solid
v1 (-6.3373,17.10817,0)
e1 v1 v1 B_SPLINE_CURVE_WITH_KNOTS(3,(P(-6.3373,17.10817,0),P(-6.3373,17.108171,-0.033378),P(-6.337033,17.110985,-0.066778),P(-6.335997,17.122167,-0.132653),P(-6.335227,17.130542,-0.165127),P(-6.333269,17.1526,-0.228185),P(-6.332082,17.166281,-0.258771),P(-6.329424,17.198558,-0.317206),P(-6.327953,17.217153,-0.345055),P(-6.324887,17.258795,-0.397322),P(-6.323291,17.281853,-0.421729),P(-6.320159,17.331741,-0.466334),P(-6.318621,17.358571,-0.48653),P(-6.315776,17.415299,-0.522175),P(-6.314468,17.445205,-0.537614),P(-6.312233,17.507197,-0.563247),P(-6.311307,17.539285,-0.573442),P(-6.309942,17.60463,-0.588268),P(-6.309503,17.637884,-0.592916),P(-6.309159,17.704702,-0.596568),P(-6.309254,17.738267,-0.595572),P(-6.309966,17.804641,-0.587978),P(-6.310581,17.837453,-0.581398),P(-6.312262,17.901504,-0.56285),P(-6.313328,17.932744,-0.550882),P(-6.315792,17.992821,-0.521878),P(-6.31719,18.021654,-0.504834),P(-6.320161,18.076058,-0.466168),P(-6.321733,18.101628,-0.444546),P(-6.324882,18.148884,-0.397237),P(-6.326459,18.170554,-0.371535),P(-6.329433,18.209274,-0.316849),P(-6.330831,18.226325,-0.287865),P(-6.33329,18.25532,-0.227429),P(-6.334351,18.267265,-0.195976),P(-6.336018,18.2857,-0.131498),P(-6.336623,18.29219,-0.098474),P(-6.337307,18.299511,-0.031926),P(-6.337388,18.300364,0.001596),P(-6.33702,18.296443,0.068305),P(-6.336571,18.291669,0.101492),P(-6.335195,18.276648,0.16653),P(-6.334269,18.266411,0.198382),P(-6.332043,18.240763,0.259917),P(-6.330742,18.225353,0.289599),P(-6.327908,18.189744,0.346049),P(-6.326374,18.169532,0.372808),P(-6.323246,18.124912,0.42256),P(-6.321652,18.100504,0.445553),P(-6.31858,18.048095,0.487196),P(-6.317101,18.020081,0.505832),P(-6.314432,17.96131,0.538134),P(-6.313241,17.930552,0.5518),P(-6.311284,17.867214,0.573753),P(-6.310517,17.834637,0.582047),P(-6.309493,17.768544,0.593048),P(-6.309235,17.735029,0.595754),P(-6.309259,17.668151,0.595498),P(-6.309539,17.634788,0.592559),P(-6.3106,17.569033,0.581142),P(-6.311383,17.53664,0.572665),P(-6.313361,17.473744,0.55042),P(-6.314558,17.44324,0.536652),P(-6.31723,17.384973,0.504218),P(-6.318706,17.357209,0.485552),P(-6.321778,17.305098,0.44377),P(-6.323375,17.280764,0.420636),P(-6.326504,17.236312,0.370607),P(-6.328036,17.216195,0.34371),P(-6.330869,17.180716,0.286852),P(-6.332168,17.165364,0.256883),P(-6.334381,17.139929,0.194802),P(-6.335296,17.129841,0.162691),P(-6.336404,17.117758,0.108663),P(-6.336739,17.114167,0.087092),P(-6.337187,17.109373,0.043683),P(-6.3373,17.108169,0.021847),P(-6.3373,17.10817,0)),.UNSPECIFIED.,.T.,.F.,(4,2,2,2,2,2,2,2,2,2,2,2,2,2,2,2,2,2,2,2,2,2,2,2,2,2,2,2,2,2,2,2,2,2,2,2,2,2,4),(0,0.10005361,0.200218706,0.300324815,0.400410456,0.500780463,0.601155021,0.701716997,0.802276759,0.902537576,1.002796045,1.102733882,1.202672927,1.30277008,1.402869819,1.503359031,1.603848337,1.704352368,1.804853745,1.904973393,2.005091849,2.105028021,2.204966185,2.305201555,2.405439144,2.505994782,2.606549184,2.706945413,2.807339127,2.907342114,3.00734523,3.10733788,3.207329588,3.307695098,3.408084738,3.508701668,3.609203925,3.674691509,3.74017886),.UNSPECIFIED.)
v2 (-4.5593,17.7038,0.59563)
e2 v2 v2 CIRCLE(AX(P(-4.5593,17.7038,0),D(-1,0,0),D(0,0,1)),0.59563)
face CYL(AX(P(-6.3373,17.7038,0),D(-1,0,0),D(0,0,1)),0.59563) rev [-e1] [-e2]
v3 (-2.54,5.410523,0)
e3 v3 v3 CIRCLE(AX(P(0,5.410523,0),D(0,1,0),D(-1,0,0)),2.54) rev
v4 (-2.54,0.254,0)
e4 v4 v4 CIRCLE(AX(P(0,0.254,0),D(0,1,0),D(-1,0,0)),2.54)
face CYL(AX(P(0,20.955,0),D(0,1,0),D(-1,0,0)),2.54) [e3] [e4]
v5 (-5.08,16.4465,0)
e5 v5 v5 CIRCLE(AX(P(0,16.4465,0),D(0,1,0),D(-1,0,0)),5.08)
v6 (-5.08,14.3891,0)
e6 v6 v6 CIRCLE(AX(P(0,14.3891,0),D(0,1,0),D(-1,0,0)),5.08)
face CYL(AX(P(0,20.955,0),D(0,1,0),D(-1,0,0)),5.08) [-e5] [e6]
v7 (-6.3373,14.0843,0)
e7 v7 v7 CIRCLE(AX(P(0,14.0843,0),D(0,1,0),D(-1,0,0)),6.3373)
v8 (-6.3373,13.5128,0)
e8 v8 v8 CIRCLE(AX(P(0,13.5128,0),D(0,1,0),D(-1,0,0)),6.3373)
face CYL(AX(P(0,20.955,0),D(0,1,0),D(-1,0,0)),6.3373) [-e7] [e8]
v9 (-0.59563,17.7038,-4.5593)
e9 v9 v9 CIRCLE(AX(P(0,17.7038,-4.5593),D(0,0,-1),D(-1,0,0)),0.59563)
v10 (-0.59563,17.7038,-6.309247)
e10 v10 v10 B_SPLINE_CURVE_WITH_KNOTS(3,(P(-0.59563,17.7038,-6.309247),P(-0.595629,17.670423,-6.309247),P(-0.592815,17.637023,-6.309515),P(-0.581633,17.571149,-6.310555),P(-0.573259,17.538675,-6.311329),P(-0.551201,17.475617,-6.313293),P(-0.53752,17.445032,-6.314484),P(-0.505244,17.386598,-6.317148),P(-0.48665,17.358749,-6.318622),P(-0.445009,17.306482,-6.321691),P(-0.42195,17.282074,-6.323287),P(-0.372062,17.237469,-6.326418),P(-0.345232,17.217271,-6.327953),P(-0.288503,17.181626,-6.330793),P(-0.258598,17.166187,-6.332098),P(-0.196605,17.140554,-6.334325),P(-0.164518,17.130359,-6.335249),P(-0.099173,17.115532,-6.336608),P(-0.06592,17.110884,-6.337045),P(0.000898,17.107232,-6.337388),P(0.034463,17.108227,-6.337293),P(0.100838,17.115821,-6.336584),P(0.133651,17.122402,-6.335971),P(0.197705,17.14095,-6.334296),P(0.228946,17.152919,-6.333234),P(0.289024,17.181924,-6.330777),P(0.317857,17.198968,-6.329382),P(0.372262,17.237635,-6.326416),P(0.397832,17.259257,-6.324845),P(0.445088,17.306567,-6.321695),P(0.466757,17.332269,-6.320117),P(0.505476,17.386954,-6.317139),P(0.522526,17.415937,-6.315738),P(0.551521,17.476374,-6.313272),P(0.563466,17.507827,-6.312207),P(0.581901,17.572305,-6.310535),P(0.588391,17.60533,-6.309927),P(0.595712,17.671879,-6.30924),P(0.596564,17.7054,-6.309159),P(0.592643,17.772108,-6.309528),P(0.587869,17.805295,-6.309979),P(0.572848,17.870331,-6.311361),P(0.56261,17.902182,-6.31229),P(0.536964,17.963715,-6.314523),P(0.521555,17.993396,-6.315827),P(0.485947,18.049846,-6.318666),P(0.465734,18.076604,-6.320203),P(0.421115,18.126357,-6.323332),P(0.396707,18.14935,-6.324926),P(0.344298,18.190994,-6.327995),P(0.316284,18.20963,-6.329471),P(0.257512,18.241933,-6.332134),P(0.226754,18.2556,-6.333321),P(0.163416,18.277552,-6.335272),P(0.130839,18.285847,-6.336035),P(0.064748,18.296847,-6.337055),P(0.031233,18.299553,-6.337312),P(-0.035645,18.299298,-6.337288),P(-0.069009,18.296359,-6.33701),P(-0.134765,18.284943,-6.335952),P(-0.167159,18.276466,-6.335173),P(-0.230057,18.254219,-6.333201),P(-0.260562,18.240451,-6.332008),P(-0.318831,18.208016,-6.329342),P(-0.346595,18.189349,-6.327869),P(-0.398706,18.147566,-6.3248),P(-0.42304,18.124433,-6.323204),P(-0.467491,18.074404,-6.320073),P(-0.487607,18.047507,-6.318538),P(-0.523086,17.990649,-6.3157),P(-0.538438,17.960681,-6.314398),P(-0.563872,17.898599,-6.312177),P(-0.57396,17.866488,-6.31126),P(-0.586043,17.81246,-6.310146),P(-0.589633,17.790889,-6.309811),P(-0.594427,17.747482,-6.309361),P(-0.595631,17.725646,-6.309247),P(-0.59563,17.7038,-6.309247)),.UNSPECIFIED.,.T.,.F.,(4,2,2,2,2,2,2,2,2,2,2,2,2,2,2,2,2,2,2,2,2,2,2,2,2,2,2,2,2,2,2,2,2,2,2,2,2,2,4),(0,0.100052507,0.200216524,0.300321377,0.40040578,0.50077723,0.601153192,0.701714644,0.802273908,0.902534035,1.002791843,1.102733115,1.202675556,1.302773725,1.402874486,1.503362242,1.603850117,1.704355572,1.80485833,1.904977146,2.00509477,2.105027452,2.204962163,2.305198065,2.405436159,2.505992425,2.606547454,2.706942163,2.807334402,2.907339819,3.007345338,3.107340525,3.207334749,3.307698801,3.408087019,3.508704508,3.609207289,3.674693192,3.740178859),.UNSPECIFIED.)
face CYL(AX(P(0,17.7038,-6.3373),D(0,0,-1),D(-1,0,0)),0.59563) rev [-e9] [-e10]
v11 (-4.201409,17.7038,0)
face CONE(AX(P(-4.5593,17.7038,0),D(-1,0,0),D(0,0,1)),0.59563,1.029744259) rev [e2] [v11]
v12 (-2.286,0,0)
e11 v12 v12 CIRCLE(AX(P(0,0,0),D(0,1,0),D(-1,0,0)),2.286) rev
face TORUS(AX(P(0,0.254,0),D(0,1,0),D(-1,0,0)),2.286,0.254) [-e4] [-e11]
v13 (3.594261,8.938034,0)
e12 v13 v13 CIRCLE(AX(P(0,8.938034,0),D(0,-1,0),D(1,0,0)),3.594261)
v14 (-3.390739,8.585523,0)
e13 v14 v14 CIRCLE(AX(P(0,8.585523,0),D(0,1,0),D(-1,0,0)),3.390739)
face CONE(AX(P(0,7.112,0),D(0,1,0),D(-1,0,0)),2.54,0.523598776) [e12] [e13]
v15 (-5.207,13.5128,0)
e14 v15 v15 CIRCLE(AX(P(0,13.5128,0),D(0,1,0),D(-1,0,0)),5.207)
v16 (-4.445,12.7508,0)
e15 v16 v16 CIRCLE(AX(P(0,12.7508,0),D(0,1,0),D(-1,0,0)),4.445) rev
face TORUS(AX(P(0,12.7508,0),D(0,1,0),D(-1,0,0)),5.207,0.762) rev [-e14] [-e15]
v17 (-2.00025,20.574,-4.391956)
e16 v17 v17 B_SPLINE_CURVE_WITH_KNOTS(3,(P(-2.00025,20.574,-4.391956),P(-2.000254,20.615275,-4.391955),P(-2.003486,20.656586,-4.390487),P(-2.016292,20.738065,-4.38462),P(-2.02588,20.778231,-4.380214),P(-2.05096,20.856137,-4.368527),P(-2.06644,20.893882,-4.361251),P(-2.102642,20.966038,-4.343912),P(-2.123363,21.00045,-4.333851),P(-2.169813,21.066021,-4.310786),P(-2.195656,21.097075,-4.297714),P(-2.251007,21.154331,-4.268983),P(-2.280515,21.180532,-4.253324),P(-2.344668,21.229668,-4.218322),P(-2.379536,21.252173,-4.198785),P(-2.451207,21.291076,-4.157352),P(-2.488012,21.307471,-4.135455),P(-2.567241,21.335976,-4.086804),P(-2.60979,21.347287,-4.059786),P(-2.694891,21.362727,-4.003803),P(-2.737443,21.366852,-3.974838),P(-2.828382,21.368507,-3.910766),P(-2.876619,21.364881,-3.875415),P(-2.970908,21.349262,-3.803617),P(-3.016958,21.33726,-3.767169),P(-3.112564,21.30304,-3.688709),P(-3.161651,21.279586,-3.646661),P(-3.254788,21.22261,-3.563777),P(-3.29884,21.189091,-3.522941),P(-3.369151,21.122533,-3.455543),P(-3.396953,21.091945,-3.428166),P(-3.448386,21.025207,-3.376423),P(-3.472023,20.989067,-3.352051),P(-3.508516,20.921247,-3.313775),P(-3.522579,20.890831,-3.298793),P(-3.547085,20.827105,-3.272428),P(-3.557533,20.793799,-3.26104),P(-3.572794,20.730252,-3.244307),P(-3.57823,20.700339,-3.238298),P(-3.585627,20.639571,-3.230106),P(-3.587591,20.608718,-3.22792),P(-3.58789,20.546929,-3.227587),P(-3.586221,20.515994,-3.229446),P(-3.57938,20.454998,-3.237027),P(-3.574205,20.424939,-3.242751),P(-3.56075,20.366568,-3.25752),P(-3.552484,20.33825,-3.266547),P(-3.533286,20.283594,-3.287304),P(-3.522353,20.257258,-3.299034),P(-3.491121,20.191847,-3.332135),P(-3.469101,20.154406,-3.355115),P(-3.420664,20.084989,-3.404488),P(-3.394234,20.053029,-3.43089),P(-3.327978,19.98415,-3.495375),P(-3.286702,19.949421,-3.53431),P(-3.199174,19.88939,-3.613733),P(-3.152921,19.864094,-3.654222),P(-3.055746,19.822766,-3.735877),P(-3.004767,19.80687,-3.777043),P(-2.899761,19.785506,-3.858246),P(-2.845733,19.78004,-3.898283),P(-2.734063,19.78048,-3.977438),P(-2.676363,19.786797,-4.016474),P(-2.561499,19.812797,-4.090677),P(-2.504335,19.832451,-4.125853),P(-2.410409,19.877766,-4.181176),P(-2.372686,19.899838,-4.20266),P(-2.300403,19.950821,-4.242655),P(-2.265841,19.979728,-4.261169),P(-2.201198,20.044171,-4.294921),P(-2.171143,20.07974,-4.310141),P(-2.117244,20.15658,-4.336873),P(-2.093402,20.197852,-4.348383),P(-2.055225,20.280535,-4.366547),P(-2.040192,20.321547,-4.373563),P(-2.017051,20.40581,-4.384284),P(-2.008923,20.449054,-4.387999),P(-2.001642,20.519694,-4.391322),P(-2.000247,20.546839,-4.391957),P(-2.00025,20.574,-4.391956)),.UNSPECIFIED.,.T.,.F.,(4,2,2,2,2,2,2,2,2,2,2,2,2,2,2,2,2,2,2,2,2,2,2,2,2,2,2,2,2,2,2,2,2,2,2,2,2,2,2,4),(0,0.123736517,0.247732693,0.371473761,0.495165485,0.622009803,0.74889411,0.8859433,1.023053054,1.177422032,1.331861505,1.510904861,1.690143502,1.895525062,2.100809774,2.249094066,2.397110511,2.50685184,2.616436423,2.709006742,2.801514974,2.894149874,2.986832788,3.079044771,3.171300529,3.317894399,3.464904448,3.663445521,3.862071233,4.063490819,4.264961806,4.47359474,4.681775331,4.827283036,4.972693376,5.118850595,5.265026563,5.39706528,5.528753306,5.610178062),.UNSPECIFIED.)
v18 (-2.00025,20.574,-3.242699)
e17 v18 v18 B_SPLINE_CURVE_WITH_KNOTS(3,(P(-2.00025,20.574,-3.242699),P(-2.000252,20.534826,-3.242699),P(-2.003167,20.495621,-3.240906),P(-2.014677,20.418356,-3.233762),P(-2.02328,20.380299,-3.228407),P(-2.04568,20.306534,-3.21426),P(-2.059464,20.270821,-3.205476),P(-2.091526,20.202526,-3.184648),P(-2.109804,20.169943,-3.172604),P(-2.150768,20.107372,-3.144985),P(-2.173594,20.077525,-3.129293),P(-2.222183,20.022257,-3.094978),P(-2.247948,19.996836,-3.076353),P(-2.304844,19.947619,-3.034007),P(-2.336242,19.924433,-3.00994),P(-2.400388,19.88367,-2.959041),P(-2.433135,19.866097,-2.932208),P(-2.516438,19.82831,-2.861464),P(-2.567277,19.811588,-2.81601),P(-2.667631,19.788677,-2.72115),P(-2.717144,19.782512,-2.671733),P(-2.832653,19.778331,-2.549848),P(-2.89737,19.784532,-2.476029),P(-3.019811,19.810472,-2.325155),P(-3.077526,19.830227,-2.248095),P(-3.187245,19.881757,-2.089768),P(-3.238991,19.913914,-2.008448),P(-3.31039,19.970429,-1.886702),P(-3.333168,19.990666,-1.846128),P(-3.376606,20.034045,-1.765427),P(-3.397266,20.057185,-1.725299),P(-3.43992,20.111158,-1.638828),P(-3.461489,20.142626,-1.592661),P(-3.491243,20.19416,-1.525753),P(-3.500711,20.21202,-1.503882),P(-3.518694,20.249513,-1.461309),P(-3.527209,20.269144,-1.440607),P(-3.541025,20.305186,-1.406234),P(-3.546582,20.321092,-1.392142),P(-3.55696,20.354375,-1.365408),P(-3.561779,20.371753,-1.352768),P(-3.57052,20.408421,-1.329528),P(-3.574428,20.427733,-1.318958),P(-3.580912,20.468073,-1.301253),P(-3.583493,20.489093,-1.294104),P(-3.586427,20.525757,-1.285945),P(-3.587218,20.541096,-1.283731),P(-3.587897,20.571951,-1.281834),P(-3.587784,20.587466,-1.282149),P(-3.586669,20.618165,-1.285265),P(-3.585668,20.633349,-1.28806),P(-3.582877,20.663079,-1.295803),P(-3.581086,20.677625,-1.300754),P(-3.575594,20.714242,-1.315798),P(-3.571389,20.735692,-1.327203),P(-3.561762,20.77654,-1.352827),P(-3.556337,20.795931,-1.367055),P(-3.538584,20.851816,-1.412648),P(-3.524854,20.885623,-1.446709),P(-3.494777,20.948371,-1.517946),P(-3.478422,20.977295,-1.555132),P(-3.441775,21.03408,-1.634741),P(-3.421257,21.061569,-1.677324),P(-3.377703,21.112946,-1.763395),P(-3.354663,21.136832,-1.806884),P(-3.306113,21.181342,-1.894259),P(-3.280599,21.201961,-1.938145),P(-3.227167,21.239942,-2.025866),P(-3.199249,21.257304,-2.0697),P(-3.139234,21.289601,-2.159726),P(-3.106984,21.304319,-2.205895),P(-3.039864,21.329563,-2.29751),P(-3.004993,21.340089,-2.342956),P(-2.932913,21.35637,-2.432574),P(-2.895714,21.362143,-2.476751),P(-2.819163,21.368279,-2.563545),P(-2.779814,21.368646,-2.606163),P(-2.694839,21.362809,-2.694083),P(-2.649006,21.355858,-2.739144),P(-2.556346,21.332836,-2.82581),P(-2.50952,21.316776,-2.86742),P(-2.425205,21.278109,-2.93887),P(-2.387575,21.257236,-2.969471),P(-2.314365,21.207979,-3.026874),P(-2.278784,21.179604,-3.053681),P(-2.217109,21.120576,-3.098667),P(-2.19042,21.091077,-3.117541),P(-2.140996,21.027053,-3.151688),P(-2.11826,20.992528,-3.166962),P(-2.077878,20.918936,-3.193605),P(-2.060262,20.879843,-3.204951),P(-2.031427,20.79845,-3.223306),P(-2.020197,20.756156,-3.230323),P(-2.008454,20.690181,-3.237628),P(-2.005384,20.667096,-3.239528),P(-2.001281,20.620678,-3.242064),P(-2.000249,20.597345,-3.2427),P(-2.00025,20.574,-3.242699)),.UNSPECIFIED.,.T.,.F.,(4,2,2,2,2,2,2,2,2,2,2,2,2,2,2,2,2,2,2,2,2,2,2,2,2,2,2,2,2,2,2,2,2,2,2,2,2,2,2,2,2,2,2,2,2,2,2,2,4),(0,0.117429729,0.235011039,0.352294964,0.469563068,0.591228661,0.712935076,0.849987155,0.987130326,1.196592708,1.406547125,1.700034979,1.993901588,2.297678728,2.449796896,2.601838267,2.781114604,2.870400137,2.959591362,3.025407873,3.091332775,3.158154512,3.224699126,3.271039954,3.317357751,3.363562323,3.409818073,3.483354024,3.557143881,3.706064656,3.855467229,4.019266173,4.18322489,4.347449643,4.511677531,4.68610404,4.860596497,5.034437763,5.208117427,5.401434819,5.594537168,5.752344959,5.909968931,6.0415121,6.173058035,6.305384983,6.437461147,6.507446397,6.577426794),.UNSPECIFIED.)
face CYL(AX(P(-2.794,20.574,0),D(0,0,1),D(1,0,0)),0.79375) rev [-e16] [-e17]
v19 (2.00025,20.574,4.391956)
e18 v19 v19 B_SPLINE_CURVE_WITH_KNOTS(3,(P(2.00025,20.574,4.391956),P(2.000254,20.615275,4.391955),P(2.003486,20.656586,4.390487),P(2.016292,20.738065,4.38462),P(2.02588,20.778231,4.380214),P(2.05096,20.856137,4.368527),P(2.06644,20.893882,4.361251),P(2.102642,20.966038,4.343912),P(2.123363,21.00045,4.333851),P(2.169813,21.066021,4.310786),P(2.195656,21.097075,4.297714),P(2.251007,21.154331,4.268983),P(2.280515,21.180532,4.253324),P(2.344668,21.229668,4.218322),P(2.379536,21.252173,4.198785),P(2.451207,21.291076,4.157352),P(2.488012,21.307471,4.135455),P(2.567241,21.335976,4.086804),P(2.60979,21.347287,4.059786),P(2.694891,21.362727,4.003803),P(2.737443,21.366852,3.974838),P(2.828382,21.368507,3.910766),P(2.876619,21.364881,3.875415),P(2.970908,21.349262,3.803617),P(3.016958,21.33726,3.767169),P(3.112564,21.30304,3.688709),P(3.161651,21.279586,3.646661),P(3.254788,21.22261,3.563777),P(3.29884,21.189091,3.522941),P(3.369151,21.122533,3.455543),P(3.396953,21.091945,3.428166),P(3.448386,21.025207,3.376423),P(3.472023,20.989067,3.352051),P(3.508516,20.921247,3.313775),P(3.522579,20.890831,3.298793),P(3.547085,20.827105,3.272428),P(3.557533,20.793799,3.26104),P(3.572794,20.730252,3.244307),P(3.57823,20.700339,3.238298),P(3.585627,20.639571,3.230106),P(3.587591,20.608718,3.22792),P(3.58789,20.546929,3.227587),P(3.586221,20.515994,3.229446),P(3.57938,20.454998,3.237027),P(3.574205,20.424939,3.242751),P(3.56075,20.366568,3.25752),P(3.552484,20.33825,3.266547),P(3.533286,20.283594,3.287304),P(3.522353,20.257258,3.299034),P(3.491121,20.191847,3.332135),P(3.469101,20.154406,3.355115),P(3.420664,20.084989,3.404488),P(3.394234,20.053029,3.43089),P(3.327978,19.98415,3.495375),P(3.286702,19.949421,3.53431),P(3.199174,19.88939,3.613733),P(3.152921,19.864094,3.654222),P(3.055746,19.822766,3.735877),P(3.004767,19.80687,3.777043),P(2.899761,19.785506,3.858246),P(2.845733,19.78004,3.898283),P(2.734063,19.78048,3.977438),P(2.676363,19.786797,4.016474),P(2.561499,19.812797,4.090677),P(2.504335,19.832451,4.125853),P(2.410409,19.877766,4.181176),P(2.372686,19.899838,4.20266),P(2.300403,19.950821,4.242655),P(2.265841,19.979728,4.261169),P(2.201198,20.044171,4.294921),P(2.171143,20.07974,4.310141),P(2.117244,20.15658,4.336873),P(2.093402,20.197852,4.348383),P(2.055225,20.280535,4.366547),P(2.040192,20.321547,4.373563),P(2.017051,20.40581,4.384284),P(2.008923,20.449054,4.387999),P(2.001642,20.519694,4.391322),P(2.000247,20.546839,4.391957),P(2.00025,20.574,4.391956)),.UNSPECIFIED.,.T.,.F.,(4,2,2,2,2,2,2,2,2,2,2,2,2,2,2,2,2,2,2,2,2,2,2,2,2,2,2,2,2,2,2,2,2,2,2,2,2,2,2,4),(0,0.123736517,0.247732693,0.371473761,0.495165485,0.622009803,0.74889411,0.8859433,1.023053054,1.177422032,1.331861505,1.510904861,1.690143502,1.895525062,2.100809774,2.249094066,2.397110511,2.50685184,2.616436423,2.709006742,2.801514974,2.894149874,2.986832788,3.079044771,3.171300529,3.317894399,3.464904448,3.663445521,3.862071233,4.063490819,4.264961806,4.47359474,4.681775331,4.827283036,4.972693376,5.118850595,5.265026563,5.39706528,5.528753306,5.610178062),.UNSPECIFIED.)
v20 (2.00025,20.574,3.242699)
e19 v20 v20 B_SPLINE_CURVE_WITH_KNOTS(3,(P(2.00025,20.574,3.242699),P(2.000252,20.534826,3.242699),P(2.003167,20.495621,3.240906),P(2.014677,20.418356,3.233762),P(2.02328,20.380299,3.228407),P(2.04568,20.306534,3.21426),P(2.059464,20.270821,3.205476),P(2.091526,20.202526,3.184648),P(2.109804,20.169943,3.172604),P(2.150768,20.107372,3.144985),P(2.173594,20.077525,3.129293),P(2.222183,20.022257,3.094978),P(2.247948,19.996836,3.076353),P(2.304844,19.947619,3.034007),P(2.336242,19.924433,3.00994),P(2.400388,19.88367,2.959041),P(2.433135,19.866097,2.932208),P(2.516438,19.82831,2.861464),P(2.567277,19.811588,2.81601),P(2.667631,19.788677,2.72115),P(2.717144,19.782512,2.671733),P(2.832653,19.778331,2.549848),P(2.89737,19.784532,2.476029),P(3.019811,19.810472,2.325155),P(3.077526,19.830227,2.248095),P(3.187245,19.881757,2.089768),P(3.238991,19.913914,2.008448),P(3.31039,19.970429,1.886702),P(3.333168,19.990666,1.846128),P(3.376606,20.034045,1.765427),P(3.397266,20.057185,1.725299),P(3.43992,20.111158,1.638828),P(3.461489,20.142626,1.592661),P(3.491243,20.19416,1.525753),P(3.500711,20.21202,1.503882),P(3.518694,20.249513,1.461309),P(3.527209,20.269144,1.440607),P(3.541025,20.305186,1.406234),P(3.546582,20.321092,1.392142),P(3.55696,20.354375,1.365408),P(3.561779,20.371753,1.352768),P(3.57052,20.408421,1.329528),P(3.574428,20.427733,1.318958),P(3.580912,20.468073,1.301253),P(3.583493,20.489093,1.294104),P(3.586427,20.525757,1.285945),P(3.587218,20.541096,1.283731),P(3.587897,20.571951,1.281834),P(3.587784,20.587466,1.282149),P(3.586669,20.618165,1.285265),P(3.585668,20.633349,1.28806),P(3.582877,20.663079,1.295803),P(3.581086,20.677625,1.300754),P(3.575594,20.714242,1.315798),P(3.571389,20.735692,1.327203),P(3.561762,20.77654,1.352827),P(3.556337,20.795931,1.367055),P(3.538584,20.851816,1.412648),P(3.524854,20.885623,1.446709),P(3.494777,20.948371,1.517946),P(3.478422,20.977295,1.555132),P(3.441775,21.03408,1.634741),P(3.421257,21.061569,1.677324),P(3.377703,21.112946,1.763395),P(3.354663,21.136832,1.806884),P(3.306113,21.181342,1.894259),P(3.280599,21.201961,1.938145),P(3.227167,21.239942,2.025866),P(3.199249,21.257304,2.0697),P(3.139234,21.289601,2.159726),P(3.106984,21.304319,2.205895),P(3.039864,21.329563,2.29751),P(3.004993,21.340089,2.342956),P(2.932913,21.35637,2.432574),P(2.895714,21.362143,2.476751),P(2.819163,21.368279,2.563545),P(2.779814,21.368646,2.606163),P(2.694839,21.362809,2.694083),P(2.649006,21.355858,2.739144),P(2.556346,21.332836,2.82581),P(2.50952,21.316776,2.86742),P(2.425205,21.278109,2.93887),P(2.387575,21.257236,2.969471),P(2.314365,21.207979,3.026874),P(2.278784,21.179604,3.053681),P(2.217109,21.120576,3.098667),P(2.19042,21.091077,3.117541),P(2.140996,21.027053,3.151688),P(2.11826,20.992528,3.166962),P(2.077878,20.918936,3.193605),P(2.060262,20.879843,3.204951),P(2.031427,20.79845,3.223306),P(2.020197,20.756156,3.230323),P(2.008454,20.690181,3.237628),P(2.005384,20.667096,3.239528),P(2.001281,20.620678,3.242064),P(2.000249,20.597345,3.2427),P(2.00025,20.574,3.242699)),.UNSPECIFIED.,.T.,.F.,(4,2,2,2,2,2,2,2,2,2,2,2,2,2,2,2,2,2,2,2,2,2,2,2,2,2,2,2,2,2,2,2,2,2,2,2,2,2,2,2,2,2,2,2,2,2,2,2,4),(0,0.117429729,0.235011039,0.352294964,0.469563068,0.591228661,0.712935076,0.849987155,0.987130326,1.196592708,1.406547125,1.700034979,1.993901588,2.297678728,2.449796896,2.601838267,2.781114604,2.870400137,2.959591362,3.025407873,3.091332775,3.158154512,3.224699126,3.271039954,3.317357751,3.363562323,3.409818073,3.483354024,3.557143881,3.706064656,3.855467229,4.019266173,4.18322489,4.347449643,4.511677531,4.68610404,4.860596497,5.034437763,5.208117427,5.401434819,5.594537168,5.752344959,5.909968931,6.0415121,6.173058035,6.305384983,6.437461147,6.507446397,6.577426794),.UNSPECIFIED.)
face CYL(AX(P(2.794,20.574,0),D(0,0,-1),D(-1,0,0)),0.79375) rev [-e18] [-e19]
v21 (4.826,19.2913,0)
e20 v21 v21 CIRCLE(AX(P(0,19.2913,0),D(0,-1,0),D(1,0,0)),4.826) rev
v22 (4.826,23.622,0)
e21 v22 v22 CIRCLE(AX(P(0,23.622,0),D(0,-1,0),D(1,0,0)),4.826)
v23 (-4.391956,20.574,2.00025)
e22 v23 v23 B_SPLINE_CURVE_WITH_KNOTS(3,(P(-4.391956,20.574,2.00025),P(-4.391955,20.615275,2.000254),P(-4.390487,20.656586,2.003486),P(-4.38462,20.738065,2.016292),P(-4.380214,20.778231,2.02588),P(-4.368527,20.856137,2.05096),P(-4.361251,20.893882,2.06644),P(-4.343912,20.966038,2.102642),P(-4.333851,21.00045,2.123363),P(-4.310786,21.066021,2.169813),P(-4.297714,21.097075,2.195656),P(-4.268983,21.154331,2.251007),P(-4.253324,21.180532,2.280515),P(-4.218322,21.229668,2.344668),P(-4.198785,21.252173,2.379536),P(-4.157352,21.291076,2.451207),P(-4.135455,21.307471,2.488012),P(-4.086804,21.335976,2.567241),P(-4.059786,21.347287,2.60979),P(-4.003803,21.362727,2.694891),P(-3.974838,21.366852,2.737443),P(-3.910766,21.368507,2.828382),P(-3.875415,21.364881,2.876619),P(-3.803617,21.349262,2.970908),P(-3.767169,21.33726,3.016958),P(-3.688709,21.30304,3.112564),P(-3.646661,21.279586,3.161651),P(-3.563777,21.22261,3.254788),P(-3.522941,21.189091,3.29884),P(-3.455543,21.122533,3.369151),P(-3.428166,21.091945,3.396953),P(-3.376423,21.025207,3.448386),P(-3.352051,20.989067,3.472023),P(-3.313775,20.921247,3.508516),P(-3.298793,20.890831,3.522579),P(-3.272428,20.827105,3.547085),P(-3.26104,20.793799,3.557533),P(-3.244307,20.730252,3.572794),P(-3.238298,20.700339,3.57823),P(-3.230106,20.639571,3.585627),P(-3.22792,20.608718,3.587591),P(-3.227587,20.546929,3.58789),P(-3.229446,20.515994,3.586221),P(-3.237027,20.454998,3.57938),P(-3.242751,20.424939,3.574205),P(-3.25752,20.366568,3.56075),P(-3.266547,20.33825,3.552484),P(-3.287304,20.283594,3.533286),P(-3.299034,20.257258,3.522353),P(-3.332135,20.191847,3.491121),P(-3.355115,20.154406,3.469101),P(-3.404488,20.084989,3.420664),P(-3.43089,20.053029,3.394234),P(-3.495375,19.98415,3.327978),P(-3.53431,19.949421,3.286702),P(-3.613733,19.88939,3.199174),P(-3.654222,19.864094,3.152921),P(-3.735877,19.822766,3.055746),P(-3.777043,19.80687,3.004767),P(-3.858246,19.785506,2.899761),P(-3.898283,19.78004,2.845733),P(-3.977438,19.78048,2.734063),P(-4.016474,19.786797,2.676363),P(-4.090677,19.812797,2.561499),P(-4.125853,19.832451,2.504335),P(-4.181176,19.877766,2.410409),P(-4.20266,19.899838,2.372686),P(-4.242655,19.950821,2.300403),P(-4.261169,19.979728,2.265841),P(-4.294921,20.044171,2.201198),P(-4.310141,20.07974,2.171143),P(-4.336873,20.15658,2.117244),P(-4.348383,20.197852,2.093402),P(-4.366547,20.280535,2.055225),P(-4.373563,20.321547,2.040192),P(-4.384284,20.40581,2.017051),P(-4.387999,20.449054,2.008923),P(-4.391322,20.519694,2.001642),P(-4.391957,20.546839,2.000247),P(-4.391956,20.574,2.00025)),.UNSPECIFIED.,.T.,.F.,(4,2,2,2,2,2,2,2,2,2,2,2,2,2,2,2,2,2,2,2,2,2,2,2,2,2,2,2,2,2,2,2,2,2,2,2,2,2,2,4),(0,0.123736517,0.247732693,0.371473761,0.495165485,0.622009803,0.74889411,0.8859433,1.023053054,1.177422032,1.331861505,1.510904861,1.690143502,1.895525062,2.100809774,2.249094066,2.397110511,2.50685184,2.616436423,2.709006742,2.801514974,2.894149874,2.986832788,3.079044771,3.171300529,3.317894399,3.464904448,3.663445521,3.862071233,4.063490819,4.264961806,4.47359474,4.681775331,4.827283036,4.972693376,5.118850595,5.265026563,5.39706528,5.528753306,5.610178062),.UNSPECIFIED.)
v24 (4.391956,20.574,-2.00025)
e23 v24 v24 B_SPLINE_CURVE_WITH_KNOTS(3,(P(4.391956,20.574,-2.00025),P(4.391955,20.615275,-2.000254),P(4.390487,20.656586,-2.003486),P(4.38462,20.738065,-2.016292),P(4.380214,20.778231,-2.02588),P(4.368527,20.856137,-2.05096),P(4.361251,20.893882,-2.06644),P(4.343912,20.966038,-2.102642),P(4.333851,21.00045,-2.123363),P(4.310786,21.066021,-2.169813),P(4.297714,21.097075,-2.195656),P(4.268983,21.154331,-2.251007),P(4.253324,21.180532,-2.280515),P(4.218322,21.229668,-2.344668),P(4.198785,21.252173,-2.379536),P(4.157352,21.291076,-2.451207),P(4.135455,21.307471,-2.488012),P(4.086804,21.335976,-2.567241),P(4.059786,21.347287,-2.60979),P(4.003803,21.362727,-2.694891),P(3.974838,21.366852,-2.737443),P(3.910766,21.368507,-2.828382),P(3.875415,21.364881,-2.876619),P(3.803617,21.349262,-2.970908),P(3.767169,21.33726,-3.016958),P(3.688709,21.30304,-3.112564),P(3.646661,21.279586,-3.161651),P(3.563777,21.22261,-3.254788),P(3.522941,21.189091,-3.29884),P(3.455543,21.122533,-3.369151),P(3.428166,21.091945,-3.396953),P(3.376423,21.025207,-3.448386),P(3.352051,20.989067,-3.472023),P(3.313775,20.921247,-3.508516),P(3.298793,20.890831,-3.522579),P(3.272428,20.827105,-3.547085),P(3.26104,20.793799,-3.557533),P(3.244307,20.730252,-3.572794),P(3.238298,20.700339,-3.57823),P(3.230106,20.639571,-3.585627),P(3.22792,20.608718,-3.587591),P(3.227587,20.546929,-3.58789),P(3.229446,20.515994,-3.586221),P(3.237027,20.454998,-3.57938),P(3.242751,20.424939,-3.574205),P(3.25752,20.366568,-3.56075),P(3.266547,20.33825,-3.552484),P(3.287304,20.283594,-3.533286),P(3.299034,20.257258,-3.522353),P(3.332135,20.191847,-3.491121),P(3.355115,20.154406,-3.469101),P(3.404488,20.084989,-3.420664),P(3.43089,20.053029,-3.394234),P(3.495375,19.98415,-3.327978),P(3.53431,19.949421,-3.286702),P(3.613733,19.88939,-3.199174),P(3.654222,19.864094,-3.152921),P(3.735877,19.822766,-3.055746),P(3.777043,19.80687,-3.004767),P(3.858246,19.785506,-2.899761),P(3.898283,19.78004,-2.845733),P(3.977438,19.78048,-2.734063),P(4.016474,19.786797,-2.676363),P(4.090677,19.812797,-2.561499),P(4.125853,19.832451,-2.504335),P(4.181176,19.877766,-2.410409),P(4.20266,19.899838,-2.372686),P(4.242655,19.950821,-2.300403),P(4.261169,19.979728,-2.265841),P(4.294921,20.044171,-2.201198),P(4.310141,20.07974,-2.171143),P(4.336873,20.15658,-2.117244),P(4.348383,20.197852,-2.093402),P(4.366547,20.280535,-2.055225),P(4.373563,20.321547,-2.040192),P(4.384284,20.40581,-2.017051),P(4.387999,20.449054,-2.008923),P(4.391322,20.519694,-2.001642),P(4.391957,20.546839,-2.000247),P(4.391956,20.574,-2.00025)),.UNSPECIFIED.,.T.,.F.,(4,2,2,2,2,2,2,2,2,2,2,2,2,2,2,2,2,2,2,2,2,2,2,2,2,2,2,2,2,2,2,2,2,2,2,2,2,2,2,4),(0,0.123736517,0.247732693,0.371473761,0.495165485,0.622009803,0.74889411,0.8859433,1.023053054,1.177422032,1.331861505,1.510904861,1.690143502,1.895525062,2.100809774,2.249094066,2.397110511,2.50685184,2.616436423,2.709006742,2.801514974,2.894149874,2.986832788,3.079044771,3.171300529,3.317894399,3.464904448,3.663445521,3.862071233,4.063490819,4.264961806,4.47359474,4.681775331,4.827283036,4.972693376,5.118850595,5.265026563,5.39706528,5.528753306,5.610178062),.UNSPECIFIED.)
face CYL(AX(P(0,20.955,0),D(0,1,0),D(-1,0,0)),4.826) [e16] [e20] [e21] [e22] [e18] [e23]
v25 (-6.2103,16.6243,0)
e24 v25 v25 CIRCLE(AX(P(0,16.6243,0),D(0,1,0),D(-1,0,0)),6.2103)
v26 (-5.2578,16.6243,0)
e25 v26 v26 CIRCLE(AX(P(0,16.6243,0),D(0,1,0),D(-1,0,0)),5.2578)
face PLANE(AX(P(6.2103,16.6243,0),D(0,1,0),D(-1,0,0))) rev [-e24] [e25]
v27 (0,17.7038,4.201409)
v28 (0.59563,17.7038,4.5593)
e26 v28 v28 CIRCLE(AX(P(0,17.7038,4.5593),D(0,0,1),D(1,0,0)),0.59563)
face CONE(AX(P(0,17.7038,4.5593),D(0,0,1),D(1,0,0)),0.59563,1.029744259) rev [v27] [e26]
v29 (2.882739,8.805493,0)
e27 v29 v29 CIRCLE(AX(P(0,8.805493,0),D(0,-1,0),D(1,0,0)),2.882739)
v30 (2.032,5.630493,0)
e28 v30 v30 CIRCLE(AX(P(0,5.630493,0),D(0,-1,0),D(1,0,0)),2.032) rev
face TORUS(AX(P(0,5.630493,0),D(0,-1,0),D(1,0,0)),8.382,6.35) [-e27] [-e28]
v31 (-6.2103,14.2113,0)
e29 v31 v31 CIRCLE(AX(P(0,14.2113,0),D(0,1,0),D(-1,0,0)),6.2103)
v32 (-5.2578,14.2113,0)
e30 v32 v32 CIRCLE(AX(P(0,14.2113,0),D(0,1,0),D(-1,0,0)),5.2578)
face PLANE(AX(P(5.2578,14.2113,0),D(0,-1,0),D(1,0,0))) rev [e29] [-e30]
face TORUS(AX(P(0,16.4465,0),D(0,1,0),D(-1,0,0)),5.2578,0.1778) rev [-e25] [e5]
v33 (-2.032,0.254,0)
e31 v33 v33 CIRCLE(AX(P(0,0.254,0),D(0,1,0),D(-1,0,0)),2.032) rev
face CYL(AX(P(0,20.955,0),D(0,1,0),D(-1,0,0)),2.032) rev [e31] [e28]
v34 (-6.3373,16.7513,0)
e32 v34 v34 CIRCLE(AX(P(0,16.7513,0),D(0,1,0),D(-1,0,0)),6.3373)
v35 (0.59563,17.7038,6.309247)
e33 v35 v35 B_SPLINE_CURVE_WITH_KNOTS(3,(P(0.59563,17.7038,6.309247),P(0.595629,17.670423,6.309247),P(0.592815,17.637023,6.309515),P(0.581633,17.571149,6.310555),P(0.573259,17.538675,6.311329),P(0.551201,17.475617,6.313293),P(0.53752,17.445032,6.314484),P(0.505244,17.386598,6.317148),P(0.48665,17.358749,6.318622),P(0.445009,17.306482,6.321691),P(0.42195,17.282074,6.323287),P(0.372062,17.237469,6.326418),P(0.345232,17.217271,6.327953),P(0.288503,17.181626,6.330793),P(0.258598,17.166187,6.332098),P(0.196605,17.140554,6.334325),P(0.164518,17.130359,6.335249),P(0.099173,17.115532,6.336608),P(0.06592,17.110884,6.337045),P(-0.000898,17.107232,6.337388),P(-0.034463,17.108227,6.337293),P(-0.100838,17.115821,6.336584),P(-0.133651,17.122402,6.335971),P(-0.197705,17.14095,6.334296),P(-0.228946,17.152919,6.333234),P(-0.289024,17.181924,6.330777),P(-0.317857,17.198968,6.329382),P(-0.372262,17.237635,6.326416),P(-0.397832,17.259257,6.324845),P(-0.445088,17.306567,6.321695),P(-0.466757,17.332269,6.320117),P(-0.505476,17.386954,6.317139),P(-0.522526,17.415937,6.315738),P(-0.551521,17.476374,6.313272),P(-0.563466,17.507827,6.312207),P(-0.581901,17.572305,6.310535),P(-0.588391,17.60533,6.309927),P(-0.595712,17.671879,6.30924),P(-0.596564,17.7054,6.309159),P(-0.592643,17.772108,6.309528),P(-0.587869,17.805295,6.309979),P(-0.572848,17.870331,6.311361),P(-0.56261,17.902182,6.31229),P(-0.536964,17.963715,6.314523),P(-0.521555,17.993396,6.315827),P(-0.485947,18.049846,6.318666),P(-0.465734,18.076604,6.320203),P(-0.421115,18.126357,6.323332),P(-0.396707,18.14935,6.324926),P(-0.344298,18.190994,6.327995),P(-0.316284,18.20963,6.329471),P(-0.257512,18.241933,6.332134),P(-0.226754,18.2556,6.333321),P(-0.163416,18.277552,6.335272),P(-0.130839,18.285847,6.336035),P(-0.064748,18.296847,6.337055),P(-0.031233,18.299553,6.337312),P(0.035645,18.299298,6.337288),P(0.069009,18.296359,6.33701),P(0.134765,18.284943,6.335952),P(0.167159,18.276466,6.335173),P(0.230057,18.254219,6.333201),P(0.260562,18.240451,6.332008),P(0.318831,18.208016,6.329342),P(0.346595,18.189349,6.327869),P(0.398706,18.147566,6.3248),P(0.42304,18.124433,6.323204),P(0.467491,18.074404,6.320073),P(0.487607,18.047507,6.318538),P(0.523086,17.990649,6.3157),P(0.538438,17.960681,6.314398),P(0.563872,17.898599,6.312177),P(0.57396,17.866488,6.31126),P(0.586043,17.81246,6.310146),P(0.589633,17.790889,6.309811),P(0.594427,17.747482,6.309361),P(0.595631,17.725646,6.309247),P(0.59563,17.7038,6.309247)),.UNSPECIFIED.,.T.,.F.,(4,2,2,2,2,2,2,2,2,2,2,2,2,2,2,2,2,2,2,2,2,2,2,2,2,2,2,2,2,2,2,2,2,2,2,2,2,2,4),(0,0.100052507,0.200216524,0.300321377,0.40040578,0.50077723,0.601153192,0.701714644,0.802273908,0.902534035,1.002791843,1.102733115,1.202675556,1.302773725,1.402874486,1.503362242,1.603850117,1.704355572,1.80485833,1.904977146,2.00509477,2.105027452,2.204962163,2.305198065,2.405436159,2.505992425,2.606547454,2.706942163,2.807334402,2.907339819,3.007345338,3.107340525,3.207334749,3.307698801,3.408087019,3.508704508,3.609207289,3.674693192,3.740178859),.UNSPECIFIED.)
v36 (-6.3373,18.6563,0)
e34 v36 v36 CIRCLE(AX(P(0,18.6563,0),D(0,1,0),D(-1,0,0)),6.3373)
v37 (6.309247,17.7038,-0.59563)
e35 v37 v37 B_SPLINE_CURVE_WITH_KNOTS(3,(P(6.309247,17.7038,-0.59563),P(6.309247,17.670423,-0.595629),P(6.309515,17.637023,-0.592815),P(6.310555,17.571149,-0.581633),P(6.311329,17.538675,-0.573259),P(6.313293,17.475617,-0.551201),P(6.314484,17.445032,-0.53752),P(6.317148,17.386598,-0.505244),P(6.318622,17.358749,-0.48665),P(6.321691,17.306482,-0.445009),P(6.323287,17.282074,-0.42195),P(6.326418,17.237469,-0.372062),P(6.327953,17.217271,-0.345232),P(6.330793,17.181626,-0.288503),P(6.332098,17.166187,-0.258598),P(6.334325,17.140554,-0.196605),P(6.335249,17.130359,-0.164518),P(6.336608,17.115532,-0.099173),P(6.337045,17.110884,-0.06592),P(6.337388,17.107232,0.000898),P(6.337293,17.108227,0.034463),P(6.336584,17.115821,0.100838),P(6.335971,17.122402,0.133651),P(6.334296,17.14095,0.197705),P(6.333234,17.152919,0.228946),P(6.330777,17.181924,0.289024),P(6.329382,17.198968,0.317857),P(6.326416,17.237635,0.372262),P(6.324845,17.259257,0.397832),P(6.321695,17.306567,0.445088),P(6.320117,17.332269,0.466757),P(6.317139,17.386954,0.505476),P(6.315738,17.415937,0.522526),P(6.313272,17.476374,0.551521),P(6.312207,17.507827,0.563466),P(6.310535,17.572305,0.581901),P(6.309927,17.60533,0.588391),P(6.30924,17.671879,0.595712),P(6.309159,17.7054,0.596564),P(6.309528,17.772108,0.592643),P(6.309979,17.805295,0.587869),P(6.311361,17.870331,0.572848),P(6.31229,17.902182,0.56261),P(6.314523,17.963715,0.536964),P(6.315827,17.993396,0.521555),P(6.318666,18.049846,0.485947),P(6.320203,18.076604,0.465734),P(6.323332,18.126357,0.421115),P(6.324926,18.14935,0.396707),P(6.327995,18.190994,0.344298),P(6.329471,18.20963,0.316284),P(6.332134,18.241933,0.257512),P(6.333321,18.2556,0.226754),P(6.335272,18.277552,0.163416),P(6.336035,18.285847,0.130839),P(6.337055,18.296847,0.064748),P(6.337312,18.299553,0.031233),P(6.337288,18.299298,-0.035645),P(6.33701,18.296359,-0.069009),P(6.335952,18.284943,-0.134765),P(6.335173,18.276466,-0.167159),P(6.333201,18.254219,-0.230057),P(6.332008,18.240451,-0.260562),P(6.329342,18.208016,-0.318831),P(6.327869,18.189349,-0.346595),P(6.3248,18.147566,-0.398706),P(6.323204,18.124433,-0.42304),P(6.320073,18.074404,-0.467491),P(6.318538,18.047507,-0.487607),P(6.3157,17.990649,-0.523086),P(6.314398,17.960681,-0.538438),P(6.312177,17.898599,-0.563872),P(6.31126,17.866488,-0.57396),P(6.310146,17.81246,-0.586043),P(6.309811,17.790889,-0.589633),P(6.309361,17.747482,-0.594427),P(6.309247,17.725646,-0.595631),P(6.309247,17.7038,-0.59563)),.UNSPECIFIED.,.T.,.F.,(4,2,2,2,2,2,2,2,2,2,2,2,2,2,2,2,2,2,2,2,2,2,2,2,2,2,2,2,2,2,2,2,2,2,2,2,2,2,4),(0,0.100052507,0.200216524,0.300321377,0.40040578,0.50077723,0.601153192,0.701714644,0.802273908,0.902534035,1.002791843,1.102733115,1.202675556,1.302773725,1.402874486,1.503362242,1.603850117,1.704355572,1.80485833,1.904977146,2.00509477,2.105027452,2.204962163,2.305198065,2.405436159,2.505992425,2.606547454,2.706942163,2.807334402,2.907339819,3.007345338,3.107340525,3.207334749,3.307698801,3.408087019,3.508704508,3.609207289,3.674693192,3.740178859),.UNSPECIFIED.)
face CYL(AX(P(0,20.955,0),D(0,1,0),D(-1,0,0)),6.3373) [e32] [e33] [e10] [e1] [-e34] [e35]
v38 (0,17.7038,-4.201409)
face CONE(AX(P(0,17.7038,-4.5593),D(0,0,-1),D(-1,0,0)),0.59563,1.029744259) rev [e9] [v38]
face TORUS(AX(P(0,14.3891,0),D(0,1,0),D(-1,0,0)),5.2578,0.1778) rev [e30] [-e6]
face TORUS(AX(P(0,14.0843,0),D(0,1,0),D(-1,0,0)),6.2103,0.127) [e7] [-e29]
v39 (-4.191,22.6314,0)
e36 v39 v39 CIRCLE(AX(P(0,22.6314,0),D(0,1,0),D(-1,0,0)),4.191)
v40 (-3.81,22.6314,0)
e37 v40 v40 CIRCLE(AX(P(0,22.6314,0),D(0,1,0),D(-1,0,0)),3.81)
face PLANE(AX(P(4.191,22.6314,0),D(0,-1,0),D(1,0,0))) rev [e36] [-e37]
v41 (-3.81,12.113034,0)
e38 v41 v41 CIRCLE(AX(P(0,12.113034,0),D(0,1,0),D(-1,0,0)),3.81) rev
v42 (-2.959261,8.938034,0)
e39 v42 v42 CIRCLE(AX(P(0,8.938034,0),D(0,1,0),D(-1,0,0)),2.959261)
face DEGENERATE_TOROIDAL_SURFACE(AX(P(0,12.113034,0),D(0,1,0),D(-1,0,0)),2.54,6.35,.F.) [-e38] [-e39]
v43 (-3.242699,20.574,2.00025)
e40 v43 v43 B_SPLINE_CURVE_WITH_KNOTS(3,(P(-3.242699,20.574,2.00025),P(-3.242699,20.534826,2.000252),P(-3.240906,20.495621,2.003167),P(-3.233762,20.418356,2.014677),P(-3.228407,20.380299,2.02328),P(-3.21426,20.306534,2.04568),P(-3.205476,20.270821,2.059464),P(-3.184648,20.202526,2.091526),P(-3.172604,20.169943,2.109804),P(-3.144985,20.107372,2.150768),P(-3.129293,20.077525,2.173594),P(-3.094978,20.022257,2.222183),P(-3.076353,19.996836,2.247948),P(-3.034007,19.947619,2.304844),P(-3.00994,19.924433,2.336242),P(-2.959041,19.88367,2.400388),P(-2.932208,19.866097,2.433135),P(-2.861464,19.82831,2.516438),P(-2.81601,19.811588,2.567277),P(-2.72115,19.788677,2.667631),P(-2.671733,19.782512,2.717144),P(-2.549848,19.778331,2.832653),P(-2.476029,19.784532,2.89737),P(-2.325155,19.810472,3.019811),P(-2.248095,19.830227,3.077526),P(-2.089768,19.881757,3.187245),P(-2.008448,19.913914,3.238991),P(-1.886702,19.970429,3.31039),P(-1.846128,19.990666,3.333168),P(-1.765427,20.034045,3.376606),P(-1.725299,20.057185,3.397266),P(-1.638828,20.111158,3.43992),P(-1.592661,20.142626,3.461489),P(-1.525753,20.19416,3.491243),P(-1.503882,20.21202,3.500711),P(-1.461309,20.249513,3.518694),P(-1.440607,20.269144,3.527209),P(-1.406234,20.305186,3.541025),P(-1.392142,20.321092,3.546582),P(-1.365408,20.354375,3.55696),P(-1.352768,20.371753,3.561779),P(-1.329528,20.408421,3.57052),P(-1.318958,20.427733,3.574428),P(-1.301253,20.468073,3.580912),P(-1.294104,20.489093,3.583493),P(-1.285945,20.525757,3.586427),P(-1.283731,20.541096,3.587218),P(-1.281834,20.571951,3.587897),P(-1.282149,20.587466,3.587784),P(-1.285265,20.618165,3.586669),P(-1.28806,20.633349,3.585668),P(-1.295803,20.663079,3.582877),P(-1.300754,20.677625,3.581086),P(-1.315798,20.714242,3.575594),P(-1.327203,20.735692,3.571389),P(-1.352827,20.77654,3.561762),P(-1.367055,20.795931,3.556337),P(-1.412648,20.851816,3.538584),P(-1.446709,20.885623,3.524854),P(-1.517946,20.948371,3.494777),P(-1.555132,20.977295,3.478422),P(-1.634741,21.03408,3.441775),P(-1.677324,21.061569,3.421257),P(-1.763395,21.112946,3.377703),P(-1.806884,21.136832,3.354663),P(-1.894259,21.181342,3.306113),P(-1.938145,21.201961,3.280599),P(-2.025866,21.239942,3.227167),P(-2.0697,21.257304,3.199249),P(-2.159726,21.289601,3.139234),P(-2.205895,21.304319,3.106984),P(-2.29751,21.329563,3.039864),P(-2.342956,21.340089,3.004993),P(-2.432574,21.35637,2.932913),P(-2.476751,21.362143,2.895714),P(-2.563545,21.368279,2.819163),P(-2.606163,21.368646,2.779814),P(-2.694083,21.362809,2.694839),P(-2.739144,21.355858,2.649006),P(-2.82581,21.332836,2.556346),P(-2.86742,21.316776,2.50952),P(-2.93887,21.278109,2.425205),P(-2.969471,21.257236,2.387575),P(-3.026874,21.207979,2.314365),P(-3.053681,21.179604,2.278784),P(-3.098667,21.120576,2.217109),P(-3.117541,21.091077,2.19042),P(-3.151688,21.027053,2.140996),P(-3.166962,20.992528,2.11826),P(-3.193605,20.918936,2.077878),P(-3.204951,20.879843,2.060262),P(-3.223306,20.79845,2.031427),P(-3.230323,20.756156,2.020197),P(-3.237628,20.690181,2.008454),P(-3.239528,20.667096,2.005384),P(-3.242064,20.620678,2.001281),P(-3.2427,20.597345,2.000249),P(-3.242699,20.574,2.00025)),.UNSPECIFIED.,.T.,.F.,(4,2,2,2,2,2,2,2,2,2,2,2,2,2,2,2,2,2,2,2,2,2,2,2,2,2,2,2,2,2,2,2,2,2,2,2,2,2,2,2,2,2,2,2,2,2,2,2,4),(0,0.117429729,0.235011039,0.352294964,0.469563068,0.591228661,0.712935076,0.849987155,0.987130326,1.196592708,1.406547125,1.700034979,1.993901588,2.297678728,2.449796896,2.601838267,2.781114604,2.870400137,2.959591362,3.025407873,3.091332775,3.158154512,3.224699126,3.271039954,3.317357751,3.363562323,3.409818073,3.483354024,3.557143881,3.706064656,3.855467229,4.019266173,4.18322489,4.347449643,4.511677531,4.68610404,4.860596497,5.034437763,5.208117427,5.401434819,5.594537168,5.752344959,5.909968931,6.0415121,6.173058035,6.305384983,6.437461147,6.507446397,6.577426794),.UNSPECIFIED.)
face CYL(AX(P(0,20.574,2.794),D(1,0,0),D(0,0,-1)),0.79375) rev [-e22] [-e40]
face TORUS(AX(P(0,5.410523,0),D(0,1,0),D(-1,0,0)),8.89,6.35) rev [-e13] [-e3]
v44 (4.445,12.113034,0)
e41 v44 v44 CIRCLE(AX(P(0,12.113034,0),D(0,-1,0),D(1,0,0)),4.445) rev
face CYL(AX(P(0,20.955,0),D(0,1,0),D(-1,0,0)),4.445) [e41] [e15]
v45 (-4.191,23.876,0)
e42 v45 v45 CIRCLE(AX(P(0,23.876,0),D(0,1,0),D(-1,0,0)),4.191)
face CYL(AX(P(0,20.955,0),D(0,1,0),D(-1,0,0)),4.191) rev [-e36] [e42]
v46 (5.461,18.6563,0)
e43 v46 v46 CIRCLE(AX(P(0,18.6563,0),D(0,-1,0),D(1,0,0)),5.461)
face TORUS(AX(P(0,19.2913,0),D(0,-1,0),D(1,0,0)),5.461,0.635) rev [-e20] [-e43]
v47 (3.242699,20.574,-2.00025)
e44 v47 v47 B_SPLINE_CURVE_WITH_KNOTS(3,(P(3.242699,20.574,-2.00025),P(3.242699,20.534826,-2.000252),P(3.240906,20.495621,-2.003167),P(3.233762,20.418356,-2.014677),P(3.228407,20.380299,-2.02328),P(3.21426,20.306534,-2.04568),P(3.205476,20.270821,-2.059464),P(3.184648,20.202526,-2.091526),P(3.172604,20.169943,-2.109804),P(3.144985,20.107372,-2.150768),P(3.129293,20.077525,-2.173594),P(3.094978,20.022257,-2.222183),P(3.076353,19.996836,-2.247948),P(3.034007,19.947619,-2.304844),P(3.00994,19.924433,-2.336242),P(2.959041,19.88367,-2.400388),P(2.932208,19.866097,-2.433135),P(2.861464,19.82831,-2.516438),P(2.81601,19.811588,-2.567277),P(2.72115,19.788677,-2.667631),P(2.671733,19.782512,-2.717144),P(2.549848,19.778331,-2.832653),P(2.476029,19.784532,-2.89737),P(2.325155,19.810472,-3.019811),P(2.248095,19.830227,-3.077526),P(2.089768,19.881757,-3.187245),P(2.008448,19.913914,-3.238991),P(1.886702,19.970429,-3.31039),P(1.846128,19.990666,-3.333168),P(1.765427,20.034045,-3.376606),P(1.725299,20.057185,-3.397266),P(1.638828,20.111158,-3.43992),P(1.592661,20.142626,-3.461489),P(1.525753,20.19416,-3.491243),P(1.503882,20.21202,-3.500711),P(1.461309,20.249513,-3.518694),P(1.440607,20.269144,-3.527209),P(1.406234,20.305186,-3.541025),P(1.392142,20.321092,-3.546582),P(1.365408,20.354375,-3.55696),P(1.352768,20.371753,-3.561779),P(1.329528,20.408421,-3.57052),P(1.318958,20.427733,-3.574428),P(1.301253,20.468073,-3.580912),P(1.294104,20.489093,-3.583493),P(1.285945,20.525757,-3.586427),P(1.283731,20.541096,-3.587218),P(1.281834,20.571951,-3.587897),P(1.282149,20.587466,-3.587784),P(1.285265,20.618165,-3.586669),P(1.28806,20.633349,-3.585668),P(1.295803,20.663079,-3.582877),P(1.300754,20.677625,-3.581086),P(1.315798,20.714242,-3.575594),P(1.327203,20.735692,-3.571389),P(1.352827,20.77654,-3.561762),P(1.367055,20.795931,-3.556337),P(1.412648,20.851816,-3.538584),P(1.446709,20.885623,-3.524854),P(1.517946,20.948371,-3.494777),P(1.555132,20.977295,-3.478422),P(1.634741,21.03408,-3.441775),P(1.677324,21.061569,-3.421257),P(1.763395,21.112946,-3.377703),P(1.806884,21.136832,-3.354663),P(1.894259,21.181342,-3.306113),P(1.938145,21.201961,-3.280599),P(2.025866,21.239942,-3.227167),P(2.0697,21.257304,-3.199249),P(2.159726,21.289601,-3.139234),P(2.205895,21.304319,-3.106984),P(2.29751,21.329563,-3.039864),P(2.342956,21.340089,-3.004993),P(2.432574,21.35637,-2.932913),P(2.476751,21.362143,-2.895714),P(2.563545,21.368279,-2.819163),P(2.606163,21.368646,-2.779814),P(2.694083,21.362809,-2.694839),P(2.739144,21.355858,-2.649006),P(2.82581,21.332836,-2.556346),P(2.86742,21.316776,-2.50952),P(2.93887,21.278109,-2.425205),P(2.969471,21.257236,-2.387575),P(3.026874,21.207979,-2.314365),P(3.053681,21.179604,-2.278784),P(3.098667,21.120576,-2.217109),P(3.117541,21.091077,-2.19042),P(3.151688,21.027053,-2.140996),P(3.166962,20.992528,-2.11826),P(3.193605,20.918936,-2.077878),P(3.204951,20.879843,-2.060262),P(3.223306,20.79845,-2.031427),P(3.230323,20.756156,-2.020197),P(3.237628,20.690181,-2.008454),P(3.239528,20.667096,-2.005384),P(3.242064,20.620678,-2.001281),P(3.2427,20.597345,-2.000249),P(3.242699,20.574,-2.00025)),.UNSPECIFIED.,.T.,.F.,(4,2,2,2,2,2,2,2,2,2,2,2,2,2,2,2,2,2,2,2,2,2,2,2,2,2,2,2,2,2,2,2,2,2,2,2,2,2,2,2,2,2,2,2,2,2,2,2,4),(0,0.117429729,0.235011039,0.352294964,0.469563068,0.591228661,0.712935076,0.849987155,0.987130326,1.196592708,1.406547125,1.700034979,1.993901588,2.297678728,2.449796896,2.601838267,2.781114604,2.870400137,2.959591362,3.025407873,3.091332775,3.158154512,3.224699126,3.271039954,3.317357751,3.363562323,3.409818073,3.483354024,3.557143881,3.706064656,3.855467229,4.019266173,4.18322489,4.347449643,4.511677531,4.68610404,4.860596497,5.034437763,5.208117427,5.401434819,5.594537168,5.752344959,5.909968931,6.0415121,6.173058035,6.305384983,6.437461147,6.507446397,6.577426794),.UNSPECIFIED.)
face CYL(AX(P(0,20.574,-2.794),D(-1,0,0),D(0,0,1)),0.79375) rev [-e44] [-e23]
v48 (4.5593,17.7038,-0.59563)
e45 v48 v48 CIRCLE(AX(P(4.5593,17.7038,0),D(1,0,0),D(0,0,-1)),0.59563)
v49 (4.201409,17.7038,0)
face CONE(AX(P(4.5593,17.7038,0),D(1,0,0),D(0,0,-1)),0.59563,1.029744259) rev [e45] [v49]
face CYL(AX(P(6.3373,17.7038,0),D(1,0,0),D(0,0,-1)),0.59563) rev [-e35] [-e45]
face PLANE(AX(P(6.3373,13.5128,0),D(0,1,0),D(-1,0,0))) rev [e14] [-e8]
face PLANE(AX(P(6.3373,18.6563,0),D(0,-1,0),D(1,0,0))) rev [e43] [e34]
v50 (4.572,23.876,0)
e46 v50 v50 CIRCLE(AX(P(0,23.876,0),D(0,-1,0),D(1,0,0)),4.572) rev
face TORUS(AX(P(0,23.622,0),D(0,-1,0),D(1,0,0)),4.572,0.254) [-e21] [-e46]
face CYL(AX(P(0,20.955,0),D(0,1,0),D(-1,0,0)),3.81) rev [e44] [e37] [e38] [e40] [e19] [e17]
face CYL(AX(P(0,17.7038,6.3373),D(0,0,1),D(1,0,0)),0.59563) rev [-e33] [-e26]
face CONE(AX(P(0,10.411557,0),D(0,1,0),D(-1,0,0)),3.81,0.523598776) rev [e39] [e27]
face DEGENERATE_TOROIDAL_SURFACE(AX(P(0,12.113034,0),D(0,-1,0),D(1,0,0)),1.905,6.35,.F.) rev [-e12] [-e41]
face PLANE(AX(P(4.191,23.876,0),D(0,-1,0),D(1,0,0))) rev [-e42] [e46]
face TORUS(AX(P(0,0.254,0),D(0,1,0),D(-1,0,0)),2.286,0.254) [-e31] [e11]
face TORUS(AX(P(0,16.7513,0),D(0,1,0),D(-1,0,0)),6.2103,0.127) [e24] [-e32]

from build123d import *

# Parameters (mm, degrees)
SKETCH3_W         = 0.79375
SKETCH3_H         = 6.3373
CIRPATTERN1_COUNT = 4
CIRPATTERN2_COUNT = 4
FILLET1_R         = 0.254
FILLET2_R         = 6.35
FILLET3_R         = 6.35
FILLET4_R         = 0.635
FILLET5_R         = 0.254
FILLET6_R         = 0.762


with BuildPart() as part:
    # Sketch1 → Revolve1 (revolve)
    with BuildSketch(Plane.XY, mode=Mode.PRIVATE) as revolve1_sk:
        with BuildLine():
            Line((4.826, 23.876), (4.826, 18.6563))
            Line((4.826, 18.6563), (6.3373, 18.6563))
            Line((6.3373, 18.6563), (6.3373, 17.3228))
            Line((6.3373, 17.3228), (6.3373, 16.7513))
            ThreePointArc((6.3373, 16.7513), (6.300102561, 16.661497439), (6.2103, 16.6243))
            Line((6.2103, 16.6243), (5.2578, 16.6243))
            ThreePointArc((5.2578, 16.6243), (5.132076414, 16.572223586), (5.08, 16.4465))
            Line((5.08, 16.4465), (5.08, 14.3891))
            ThreePointArc((5.08, 14.3891), (5.132076414, 14.263376414), (5.2578, 14.2113))
            Line((5.2578, 14.2113), (6.2103, 14.2113))
            ThreePointArc((6.2103, 14.2113), (6.300102561, 14.174102561), (6.3373, 14.0843))
            Line((6.3373, 14.0843), (6.3373, 13.5128))
            Line((6.3373, 13.5128), (5.0673, 13.5128))
            Line((5.0673, 13.5128), (4.445, 13.5128))
            Line((4.445, 13.5128), (4.445, 10.411556788))
            Line((4.445, 10.411556788), (2.54, 7.112))
            Line((2.54, 7.112), (2.54, 0))
            Line((2.54, 0), (2.032, 0))
            Line((2.032, 0), (2.032, 7.331970453))
            Line((2.032, 7.331970453), (3.81, 10.411556788))
            Line((3.81, 10.411556788), (3.81, 22.6314))
            Line((3.81, 22.6314), (4.191, 22.6314))
            Line((4.191, 22.6314), (4.191, 23.876))
            Line((4.191, 23.876), (4.826, 23.876))
        make_face()
    revolve(revolve1_sk.sketch.rotate(Axis((0, 20.955, 0), (0, -1, 0)), 180), axis=Axis((0, 20.955, 0), (0, -1, 0)))

    # Sketch3 → 1/16 (0.0625) Diameter Hole1 (revolve, cut)
    with BuildSketch(Plane(origin=(2.794, 20.574, 0), x_dir=(0, 1, 0), z_dir=(1, 0, 0))):
        with Locations((0.396875, 3.16865)):
            Rectangle(SKETCH3_W, SKETCH3_H)
    f_1_16_0_0625_diameter_hole1 = revolve(axis=Axis((2.794, 20.574, -6.35), (0, 0, 1)), mode=Mode.SUBTRACT)

    # CirPattern1: 1/16 (0.0625) Diameter Hole1 ×4 about axis
    cirpattern1_axis = Axis((0, 20.955, 0), (0, 1, 0))
    for i in range(1, CIRPATTERN1_COUNT):
        add(f_1_16_0_0625_diameter_hole1.rotate(cirpattern1_axis, i * 360 / CIRPATTERN1_COUNT), mode=Mode.SUBTRACT)

    # Sketch7 → #0-80 Tapped Hole1 (revolve, cut)
    with BuildSketch(Plane(origin=(0, 17.7038, 6.3373), x_dir=(0, -1, 0), z_dir=(1, 0, 0))):
        Polygon((0, 0), (0, 2.135890611), (0.59563, 1.778), (0.59563, 0), align=None)
    f_0_80_tapped_hole1 = revolve(axis=Axis((0, 17.7038, 12.6873), (0, 0, -1)), mode=Mode.SUBTRACT)

    # CirPattern2: #0-80 Tapped Hole1 ×4 about axis
    cirpattern2_axis = Axis((0, 0, 0), (0, -1, 0))
    for i in range(1, CIRPATTERN2_COUNT):
        add(f_0_80_tapped_hole1.rotate(cirpattern2_axis, i * 360 / CIRPATTERN2_COUNT), mode=Mode.SUBTRACT)

    # Fillet1
    fillet1_edges = [part.edges().sort_by_distance(p)[0] for p in [
        (4.826, 23.876, 0),
    ]]
    fillet(fillet1_edges, radius=FILLET1_R)

    # Fillet2
    fillet2_edges = [part.edges().sort_by_distance(p)[0] for p in [
        (2.032, 7.331970453, 0),
        (3.81, 10.411556788, 0),
    ]]
    fillet(fillet2_edges, radius=FILLET2_R)

    # Fillet3
    fillet3_edges = [part.edges().sort_by_distance(p)[0] for p in [
        (4.445, 10.411556788, 0),
        (2.54, 7.112, 0),
    ]]
    fillet(fillet3_edges, radius=FILLET3_R)

    # Fillet4
    fillet4_edges = [part.edges().sort_by_distance(p)[0] for p in [
        (4.826, 18.6563, 0),
    ]]
    fillet(fillet4_edges, radius=FILLET4_R)

    # Fillet5
    fillet5_edges = [part.edges().sort_by_distance(p)[0] for p in [
        (2.54, 0, 0),
        (2.032, 0, 0),
    ]]
    fillet(fillet5_edges, radius=FILLET5_R - 0.0001)  # a hair under: the kernel refuses the full size

    # Fillet6
    fillet6_edges = [part.edges().sort_by_distance(p)[0] for p in [
        (4.445, 13.5128, 0),
    ]]
    fillet(fillet6_edges, radius=FILLET6_R)


solid = part.part
